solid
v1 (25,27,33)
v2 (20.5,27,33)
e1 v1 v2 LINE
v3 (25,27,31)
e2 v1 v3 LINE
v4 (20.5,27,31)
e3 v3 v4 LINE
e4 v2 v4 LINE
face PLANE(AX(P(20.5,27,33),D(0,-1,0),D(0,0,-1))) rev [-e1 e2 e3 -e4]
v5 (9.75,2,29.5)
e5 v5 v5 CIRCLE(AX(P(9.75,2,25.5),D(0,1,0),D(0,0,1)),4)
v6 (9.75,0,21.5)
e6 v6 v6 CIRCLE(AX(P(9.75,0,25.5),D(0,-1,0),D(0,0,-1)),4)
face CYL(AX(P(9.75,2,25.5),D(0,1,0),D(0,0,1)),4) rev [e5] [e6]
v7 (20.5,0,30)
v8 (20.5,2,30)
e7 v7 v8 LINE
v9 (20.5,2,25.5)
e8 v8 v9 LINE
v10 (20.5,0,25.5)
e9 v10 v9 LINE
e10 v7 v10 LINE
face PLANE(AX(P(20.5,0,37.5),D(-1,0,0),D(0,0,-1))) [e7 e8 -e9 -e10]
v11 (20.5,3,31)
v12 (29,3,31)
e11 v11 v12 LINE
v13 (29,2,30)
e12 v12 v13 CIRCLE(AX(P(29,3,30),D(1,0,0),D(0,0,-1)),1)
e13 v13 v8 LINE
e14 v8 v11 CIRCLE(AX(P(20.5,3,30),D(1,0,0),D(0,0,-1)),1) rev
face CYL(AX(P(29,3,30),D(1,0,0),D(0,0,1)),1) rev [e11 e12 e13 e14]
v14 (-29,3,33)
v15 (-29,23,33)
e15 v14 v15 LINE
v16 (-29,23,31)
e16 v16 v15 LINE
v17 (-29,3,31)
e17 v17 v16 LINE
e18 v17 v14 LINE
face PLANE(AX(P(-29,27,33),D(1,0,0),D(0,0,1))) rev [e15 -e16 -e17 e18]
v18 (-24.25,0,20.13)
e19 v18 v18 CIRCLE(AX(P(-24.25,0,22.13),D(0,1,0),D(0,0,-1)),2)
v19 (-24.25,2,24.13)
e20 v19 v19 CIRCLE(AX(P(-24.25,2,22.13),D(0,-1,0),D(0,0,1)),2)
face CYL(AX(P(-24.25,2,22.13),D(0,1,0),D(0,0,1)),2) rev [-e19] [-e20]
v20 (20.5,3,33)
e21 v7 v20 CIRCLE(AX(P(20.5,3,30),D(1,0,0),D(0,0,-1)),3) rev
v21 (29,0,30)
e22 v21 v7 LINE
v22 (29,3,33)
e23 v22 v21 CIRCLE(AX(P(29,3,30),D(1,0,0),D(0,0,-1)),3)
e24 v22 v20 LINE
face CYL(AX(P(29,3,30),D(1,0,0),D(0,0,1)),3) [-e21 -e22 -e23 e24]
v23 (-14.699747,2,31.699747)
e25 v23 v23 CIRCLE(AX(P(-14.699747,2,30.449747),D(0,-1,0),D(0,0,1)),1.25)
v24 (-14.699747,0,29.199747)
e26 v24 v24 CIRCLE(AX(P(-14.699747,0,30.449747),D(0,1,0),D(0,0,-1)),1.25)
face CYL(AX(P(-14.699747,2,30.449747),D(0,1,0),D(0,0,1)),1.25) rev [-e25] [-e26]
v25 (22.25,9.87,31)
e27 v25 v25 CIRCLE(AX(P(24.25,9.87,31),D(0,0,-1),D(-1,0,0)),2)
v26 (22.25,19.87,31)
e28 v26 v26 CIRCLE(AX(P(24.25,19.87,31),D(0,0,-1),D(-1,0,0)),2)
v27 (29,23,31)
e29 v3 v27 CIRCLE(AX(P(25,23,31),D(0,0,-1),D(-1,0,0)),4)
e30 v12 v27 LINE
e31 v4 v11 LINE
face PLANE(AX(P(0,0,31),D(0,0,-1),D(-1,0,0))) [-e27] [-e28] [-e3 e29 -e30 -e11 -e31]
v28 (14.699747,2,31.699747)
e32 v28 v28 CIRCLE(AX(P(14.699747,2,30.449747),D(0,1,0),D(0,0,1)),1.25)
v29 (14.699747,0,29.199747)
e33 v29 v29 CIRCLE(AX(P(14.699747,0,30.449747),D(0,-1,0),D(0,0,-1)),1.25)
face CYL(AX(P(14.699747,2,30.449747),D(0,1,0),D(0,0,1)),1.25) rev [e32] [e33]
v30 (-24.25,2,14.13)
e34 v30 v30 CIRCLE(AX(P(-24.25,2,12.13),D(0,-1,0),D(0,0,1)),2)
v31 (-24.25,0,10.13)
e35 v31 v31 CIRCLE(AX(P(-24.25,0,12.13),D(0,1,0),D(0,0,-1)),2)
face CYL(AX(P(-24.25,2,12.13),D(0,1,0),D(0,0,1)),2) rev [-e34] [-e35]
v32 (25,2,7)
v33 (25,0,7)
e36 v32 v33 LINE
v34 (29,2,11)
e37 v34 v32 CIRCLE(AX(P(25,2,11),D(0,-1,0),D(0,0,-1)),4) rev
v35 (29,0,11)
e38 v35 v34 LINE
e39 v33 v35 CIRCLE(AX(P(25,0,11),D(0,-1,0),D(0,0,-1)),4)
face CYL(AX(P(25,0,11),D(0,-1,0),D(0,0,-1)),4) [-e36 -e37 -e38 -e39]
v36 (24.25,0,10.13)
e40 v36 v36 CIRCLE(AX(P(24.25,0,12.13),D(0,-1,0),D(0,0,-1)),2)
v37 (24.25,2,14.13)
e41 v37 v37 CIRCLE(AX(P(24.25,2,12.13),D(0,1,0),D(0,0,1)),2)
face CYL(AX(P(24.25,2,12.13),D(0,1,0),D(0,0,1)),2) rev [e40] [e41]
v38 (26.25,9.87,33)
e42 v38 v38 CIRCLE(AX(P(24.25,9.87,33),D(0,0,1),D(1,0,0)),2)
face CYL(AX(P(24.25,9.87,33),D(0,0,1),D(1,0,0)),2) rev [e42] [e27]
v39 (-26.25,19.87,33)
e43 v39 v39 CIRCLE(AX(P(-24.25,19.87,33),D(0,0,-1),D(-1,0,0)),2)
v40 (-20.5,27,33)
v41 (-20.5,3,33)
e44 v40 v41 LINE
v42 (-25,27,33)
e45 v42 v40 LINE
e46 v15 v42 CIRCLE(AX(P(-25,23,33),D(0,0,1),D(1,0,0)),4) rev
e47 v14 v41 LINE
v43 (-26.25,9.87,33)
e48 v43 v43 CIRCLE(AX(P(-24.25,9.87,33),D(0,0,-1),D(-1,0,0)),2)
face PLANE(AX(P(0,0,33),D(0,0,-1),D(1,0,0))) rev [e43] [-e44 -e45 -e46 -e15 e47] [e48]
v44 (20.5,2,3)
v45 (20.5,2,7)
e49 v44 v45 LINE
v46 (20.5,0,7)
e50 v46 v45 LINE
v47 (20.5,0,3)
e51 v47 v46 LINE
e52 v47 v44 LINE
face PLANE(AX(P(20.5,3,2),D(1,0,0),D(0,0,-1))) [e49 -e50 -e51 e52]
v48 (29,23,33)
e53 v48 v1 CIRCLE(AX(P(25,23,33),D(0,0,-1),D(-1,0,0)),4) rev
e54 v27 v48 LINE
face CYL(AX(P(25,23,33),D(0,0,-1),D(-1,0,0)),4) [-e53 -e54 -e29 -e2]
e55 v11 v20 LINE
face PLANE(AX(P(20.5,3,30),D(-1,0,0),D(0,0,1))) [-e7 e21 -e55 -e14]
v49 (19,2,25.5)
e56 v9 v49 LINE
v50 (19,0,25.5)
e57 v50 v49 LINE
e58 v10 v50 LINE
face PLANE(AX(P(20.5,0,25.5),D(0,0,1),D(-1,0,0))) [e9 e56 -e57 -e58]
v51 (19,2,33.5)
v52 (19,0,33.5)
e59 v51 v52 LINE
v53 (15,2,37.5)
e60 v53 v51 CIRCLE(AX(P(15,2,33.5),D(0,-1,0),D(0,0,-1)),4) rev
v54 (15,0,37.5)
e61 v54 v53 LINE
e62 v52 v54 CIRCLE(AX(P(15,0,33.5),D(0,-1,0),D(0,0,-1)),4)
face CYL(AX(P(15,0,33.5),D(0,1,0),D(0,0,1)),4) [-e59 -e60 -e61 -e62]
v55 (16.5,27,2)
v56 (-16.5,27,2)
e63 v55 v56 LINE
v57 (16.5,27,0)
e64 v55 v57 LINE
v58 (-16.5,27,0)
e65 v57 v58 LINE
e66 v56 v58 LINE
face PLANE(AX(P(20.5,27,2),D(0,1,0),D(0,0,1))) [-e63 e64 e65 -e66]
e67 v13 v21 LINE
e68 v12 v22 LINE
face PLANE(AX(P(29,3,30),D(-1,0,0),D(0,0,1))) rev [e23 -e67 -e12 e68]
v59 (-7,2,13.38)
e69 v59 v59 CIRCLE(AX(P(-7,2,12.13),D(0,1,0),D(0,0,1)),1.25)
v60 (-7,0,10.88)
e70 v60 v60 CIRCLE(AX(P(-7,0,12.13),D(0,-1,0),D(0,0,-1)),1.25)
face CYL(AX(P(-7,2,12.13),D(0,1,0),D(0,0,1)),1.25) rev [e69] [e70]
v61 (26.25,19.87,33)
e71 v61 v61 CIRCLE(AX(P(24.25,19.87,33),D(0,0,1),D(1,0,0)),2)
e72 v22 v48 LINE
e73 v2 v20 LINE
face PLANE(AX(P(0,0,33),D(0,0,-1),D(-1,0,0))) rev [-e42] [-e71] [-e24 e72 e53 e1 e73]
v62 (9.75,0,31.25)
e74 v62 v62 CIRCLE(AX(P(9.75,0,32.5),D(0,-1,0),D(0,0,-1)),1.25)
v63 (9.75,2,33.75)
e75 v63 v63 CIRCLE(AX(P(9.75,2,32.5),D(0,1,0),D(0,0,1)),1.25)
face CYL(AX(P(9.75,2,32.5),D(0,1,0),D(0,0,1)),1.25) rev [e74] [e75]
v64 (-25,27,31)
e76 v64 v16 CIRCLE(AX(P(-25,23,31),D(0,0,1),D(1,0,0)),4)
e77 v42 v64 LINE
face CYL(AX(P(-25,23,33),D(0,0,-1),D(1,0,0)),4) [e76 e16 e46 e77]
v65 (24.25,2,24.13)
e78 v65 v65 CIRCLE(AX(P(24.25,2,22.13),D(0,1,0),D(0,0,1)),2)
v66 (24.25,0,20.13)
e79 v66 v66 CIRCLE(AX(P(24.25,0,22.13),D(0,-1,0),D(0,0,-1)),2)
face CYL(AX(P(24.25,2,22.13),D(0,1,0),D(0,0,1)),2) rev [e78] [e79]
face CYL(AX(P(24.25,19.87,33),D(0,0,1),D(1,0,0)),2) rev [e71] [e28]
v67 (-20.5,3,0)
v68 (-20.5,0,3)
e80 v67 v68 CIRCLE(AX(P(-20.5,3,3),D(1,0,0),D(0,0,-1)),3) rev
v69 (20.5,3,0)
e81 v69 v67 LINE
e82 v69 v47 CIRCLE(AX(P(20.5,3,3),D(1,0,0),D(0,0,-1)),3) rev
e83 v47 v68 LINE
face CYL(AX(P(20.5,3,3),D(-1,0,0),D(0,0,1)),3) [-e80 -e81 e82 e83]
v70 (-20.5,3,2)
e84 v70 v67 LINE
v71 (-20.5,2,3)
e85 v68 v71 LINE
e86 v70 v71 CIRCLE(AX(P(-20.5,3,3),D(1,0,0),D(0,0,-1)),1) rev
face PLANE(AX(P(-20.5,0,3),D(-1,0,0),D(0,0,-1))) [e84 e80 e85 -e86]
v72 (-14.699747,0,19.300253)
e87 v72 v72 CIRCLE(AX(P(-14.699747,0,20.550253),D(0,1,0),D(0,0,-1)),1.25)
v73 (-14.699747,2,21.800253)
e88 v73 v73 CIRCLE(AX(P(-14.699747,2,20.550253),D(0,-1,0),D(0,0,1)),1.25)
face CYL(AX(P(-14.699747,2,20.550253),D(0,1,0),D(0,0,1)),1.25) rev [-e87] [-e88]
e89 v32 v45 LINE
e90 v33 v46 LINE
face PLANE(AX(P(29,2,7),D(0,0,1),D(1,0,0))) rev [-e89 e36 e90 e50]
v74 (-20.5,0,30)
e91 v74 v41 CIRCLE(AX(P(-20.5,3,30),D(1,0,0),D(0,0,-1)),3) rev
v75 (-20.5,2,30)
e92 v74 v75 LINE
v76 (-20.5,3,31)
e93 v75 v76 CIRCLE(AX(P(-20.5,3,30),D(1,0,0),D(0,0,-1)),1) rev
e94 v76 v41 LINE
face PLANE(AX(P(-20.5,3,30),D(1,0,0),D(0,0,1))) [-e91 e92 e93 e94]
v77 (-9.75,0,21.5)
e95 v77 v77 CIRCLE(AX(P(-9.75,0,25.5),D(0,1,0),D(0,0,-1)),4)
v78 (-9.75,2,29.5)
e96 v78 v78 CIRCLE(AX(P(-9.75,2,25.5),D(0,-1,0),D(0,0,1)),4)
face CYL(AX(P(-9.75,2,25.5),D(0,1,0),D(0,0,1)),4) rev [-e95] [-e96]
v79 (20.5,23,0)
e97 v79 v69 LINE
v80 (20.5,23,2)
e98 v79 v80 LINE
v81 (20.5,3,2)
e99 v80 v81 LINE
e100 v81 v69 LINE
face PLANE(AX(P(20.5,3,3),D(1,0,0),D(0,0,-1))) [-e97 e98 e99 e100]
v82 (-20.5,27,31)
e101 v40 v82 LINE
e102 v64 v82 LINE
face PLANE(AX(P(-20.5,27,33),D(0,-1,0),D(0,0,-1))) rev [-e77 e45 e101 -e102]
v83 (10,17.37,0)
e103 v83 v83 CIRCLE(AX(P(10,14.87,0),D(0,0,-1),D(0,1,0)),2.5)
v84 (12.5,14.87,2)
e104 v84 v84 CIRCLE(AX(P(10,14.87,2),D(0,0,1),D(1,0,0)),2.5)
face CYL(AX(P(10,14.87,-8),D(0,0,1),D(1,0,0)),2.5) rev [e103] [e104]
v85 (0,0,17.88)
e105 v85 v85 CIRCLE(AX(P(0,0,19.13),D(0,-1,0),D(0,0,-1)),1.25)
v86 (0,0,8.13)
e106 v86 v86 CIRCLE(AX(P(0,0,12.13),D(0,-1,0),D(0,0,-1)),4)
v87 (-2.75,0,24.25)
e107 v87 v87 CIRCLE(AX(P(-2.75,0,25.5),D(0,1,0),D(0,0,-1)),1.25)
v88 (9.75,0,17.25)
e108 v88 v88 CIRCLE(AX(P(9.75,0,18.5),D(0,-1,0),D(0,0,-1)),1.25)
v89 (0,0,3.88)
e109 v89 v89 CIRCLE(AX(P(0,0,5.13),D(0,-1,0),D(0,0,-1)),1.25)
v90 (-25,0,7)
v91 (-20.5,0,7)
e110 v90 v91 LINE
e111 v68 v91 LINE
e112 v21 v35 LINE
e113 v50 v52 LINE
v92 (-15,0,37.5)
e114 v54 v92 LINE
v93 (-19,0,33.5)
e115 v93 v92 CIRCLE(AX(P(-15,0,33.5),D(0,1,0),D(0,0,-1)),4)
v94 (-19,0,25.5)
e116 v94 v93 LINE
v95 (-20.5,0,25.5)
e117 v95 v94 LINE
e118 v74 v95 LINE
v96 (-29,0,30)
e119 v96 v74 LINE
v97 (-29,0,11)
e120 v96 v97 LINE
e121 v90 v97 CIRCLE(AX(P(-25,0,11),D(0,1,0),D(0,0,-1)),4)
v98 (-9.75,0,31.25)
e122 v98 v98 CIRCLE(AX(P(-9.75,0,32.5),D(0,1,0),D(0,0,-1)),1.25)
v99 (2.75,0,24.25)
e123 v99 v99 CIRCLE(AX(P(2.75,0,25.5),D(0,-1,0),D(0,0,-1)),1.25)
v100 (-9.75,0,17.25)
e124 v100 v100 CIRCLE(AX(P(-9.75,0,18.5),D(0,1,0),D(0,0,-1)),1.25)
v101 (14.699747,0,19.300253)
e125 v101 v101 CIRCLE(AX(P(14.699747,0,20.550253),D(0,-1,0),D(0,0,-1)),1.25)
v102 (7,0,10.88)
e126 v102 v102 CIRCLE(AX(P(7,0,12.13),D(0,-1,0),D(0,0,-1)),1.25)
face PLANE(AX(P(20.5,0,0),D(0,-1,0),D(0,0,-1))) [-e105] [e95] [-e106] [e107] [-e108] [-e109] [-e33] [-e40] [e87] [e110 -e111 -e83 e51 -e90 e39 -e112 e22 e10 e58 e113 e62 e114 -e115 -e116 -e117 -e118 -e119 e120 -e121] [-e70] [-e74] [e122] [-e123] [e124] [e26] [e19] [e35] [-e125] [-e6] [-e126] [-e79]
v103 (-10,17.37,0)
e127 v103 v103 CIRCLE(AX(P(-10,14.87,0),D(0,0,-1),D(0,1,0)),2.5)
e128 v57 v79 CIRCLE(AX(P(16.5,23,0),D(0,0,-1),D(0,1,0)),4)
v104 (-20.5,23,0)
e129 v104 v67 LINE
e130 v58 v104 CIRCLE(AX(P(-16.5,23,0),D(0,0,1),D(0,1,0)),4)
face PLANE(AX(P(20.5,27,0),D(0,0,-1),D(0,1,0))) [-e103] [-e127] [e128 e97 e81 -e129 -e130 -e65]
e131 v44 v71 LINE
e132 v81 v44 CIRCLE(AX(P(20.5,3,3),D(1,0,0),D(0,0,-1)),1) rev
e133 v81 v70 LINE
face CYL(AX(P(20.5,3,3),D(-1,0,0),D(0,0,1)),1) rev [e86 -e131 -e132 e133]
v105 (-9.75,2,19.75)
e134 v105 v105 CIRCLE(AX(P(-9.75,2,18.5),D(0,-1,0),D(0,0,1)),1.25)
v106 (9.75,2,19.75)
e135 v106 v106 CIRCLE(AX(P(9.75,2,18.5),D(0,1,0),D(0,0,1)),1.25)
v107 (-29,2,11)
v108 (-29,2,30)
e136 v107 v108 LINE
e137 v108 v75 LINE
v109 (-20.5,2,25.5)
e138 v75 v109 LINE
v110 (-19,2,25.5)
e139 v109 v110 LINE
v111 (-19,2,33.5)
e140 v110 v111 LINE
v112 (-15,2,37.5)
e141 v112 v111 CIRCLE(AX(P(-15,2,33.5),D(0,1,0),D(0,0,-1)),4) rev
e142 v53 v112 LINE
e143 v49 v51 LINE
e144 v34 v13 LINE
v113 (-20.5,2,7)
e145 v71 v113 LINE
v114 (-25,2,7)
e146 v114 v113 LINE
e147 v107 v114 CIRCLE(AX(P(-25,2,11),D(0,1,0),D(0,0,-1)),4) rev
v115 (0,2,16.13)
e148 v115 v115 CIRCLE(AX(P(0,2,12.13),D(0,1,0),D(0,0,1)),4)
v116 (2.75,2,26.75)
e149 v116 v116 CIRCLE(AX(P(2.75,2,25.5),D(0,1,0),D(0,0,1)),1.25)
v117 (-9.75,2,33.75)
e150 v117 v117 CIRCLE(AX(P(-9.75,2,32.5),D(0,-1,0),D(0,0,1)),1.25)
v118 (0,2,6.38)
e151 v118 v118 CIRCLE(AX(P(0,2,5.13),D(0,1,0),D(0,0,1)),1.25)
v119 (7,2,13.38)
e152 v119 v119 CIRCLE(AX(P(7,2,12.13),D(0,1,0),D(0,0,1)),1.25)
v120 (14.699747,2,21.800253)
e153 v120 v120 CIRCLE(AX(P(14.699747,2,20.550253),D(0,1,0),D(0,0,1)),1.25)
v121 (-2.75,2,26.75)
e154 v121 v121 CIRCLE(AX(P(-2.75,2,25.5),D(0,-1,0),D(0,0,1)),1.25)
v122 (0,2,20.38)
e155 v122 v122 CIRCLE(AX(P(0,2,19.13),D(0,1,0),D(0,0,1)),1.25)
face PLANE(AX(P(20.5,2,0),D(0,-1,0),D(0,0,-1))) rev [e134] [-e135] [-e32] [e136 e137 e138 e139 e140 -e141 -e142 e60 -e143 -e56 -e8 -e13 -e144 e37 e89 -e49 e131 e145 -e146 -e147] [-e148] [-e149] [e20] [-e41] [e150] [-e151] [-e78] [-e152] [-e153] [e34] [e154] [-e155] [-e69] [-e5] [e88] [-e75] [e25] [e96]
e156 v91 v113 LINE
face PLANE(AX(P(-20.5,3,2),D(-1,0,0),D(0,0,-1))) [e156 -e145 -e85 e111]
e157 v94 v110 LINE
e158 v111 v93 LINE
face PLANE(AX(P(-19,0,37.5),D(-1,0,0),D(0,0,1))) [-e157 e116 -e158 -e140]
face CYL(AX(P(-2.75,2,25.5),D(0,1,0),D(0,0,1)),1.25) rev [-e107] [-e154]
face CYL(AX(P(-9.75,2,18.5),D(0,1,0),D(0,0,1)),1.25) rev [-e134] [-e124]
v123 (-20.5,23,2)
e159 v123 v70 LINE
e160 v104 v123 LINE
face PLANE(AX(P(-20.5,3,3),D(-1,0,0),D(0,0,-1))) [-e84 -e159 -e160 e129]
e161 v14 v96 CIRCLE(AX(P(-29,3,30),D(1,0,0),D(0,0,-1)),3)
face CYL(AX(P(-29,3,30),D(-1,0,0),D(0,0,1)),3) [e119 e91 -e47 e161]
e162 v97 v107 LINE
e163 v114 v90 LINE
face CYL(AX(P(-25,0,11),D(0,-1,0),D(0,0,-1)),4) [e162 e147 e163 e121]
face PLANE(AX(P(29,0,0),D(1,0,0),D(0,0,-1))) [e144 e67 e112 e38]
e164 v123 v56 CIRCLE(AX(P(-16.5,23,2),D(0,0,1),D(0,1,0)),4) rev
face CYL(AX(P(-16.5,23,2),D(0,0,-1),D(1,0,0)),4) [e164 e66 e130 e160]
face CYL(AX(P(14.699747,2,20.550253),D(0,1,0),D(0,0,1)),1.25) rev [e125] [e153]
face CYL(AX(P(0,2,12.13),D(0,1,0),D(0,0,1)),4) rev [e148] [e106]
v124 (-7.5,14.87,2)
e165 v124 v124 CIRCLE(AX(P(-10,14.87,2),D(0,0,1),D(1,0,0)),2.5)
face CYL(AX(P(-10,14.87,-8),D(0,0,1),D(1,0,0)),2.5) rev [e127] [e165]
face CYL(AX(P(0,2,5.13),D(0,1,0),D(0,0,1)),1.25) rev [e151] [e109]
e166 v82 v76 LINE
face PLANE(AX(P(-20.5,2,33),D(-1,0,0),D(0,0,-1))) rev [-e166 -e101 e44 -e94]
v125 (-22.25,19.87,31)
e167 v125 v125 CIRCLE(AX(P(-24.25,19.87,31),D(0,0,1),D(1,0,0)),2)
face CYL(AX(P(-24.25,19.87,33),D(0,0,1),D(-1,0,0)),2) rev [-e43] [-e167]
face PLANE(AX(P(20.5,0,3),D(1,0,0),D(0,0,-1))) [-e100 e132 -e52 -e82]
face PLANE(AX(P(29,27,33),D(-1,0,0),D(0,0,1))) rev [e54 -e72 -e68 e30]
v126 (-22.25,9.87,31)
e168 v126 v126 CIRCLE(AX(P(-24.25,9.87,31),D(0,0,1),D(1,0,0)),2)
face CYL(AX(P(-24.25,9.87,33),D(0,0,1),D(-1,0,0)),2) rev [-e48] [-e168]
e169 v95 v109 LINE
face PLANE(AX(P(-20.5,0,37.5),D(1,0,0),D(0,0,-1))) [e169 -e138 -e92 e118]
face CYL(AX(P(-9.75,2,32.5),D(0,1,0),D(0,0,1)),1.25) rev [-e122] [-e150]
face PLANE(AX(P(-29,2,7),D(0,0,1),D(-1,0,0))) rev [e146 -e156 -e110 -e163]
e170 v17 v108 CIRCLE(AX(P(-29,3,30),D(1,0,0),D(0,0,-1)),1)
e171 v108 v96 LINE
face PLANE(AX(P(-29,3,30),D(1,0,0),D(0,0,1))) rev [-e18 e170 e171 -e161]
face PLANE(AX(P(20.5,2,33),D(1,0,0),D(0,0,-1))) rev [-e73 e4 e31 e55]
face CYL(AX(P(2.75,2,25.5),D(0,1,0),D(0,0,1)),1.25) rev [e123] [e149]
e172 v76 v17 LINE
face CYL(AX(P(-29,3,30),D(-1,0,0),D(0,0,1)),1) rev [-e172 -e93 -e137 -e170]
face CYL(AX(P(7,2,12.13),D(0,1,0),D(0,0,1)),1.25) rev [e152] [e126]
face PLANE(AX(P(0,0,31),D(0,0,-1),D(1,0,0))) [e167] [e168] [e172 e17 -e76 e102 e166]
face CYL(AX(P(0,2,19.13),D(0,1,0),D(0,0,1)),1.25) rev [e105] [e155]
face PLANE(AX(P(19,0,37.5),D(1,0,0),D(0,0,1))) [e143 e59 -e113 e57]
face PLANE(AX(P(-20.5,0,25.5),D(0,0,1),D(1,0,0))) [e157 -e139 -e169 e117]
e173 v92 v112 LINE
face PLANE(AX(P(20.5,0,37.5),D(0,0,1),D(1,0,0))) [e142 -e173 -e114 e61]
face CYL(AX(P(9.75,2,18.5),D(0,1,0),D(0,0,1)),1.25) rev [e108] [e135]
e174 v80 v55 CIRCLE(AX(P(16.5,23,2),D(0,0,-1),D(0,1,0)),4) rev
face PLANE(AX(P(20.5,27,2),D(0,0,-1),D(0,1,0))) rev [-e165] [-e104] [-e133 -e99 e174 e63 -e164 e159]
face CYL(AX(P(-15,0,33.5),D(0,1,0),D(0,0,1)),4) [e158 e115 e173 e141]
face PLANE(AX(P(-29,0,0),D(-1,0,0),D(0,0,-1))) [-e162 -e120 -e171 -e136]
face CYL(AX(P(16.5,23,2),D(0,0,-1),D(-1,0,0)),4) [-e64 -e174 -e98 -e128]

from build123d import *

# Parameters (mm, degrees)
T_LE_DE_BASE_PLI_E1_DEPTH             = 20.5
ESQUISSE8_W                           = 24
ESQUISSE8_H                           = 2
BOSS_EXTRU_1_DEPTH                    = 8.5
T_LE_PLI_E_SUR_AR_TE1_STRIP_W         = 10
T_LE_PLI_E_SUR_AR_TE1_STRIP_H         = 2
T_LE_PLI_E_SUR_AR_TE1_STRIP_CUT_DEPTH = 8.5
T_LE_PLI_E_SUR_AR_TE1_DEPTH           = 8.5
ESQUISSE12_W                          = 1.5
ESQUISSE12_H                          = 12
ENL_V_MAT_EXTRU_1_DEPTH               = 8.5
DIAM_TRE_DU_PER_AGE_4_0_4_1_D         = 4
DIAM_TRE_DU_PER_AGE_8_0_8_1_D         = 8
DIAM_TRE_DU_PER_AGE_2_5_2_5_1_D       = 2.5
R_P_TITION_CIRCULAIRE1_COUNT          = 8
DIAM_TRE_DU_PER_AGE_4_0_4_2_D         = 4
DIAM_TRE_DU_PER_AGE_2_5_2_5_2_D       = 2.5
CONG_1_R                              = 4
DIAM_TRE_DU_PER_AGE_8_0_8_2_D         = 8
DIAM_TRE_DU_PER_AGE_2_5_2_5_3_D       = 2.5
R_P_TITION_CIRCULAIRE2_COUNT          = 4
CROQUIS1_R                            = 2.5
CORTAR_EXTRUIR1_DEPTH                 = 10


# Sheet-metal steps are written as plain solids
with BuildPart() as part:
    # Esquisse1 → Tôle de base pliée1 (new body)
    with BuildSketch(Plane(origin=(0, 0, 0), x_dir=(0, 0, -1), z_dir=(1, 0, 0))):
        with BuildLine():
            Line((0, 27), (0, 3))
            ThreePointArc((0, 3), (-0.878679656, 0.878679656), (-3, 0))
            Line((-3, 0), (-37.5, 0))
            Line((-37.5, 0), (-37.5, 2))
            Line((-37.5, 2), (-3, 2))
            ThreePointArc((-3, 2), (-2.292893219, 2.292893219), (-2, 3))
            Line((-2, 3), (-2, 27))
            Line((-2, 27), (0, 27))
        make_face()
    extrude(amount=T_LE_DE_BASE_PLI_E1_DEPTH)

    # Esquisse8 → Boss.-Extru.1 (add)
    with BuildSketch(Plane(origin=(20.5, 0, 0), x_dir=(0, 0, -1), z_dir=(1, 0, 0))):
        with Locations((-19, 1)):
            Rectangle(ESQUISSE8_W, ESQUISSE8_H)
    extrude(amount=BOSS_EXTRU_1_DEPTH)

    # Tôle pliée sur arête1 strip (across the edge) → Tôle pliée sur arête1 strip cut (cut)
    with BuildSketch(Plane(origin=(20.5, 2, 31), x_dir=(0, 0, -1), z_dir=(1, 0, 0))):
        with Locations((-4, -1)):
            Rectangle(T_LE_PLI_E_SUR_AR_TE1_STRIP_W, T_LE_PLI_E_SUR_AR_TE1_STRIP_H)
    extrude(amount=T_LE_PLI_E_SUR_AR_TE1_STRIP_CUT_DEPTH, mode=Mode.SUBTRACT)

    # Tôle pliée sur arête1 section (across the edge) → Tôle pliée sur arête1 (add)
    with BuildSketch(Plane(origin=(20.5, 2, 31), x_dir=(0, 0, -1), z_dir=(1, 0, 0))):
        with BuildLine():
            Line((-2, 1), (-2, 25))
            Line((-2, 25), (0, 25))
            Line((0, 25), (0, 1))
            ThreePointArc((0, 1), (0.292893219, 0.292893219), (1, 0))
            Line((1, 0), (1, -2))
            ThreePointArc((1, -2), (-1.121320344, -1.121320344), (-2, 1))
        make_face()
    extrude(amount=T_LE_PLI_E_SUR_AR_TE1_DEPTH)

    # Esquisse12 → Enlèv. mat.-Extru.1 (cut)
    with BuildSketch(Plane(origin=(0, 2, 0), x_dir=(1, 0, 0), z_dir=(0, 1, 0))):
        with Locations((19.75, -31.5)):
            Rectangle(ESQUISSE12_W, ESQUISSE12_H)
    extrude(amount=-ENL_V_MAT_EXTRU_1_DEPTH, mode=Mode.SUBTRACT)

    # Diamètre du perçage Ø4.0 (4)1 (through all)
    with Locations(Plane(origin=(0, 2, 0), x_dir=(1, 0, 0), z_dir=(0, 1, 0))):
        with Locations((24.25, -12.13), (24.25, -22.13)):
            Hole(DIAM_TRE_DU_PER_AGE_4_0_4_1_D / 2)

    # Diamètre du perçage Ø8.0 (8)1 (through all)
    with Locations(Plane(origin=(0, 2, 0), x_dir=(1, 0, 0), z_dir=(0, 1, 0))):
        with Locations((9.75, -25.5)):
            Hole(DIAM_TRE_DU_PER_AGE_8_0_8_1_D / 2)

    # Diamètre du perçage Ø2.5 (2.5)1 (through all)
    with Locations(Plane(origin=(0, 2, 0), x_dir=(1, 0, 0), z_dir=(0, 1, 0))):
        with Locations((9.75, -18.5)):
            diam_tre_du_per_age_2_5_2_5_1 = Hole(DIAM_TRE_DU_PER_AGE_2_5_2_5_1_D / 2)

    # Répétition circulaire1: Diamètre du perçage Ø2.5 (2.5)1 ×8 about axis, 3 skipped
    r_p_tition_circulaire1_axis = Axis((9.75, 2, 25.5), (0, 1, 0))
    add([diam_tre_du_per_age_2_5_2_5_1.rotate(r_p_tition_circulaire1_axis, i * 360 / R_P_TITION_CIRCULAIRE1_COUNT) for i in range(1, R_P_TITION_CIRCULAIRE1_COUNT) if i not in (1, 3, 6)], mode=Mode.SUBTRACT)

    # Diamètre du perçage Ø4.0 (4)2 (through all)
    with Locations(Plane.XY.offset(33)):
        with Locations((24.25, 19.87), (24.25, 9.87)):
            Hole(DIAM_TRE_DU_PER_AGE_4_0_4_2_D / 2)

    # Diamètre du perçage Ø2.5 (2.5)2 (through all)
    with Locations(Plane.XY.offset(2)):
        with Locations((10, 14.87)):
            Hole(DIAM_TRE_DU_PER_AGE_2_5_2_5_2_D / 2)

    # Congé1
    cong_1_edges = [part.edges().sort_by_distance(p)[0] for p in [
        (20.5, 27, 1),
        (29, 1, 7),
        (29, 27, 32),
        (19, 1, 37.5),
    ]]
    fillet(cong_1_edges, radius=CONG_1_R)

    # Symétrie1: part across plane


with BuildPart() as part_1:
    add(part.part)
    add(part.part.mirror(Plane(origin=(0, 3, 3), x_dir=(0, 0, 1), z_dir=(1, 0, 0))))

    # Diamètre du perçage Ø8.0 (8)2 (through all)
    with Locations(Plane(origin=(0, 2, 0), x_dir=(1, 0, 0), z_dir=(0, 1, 0))):
        with Locations((0, -12.13)):
            Hole(DIAM_TRE_DU_PER_AGE_8_0_8_2_D / 2)

    # Diamètre du perçage Ø2.5 (2.5)3 (through all)
    with Locations(Plane(origin=(0, 2, 0), x_dir=(1, 0, 0), z_dir=(0, 1, 0))):
        with Locations((0, -5.13)):
            diam_tre_du_per_age_2_5_2_5_3 = Hole(DIAM_TRE_DU_PER_AGE_2_5_2_5_3_D / 2)

    # Répétition circulaire2: Diamètre du perçage Ø2.5 (2.5)3 ×4 about axis
    r_p_tition_circulaire2_axis = Axis((0, 0, 12.13), (0, 1, 0))
    for i in range(1, R_P_TITION_CIRCULAIRE2_COUNT):
        add(diam_tre_du_per_age_2_5_2_5_3.rotate(r_p_tition_circulaire2_axis, i * 360 / R_P_TITION_CIRCULAIRE2_COUNT), mode=Mode.SUBTRACT)

    # Croquis1 → Cortar-Extruir1 (cut)
    with BuildSketch(Plane.XY.offset(2)):
        with Locations((10, 14.87)):
            Circle(CROQUIS1_R)
        with Locations((-10, 14.87)):
            Circle(CROQUIS1_R)
    extrude(amount=-CORTAR_EXTRUIR1_DEPTH, mode=Mode.SUBTRACT)


solid = part_1.part
